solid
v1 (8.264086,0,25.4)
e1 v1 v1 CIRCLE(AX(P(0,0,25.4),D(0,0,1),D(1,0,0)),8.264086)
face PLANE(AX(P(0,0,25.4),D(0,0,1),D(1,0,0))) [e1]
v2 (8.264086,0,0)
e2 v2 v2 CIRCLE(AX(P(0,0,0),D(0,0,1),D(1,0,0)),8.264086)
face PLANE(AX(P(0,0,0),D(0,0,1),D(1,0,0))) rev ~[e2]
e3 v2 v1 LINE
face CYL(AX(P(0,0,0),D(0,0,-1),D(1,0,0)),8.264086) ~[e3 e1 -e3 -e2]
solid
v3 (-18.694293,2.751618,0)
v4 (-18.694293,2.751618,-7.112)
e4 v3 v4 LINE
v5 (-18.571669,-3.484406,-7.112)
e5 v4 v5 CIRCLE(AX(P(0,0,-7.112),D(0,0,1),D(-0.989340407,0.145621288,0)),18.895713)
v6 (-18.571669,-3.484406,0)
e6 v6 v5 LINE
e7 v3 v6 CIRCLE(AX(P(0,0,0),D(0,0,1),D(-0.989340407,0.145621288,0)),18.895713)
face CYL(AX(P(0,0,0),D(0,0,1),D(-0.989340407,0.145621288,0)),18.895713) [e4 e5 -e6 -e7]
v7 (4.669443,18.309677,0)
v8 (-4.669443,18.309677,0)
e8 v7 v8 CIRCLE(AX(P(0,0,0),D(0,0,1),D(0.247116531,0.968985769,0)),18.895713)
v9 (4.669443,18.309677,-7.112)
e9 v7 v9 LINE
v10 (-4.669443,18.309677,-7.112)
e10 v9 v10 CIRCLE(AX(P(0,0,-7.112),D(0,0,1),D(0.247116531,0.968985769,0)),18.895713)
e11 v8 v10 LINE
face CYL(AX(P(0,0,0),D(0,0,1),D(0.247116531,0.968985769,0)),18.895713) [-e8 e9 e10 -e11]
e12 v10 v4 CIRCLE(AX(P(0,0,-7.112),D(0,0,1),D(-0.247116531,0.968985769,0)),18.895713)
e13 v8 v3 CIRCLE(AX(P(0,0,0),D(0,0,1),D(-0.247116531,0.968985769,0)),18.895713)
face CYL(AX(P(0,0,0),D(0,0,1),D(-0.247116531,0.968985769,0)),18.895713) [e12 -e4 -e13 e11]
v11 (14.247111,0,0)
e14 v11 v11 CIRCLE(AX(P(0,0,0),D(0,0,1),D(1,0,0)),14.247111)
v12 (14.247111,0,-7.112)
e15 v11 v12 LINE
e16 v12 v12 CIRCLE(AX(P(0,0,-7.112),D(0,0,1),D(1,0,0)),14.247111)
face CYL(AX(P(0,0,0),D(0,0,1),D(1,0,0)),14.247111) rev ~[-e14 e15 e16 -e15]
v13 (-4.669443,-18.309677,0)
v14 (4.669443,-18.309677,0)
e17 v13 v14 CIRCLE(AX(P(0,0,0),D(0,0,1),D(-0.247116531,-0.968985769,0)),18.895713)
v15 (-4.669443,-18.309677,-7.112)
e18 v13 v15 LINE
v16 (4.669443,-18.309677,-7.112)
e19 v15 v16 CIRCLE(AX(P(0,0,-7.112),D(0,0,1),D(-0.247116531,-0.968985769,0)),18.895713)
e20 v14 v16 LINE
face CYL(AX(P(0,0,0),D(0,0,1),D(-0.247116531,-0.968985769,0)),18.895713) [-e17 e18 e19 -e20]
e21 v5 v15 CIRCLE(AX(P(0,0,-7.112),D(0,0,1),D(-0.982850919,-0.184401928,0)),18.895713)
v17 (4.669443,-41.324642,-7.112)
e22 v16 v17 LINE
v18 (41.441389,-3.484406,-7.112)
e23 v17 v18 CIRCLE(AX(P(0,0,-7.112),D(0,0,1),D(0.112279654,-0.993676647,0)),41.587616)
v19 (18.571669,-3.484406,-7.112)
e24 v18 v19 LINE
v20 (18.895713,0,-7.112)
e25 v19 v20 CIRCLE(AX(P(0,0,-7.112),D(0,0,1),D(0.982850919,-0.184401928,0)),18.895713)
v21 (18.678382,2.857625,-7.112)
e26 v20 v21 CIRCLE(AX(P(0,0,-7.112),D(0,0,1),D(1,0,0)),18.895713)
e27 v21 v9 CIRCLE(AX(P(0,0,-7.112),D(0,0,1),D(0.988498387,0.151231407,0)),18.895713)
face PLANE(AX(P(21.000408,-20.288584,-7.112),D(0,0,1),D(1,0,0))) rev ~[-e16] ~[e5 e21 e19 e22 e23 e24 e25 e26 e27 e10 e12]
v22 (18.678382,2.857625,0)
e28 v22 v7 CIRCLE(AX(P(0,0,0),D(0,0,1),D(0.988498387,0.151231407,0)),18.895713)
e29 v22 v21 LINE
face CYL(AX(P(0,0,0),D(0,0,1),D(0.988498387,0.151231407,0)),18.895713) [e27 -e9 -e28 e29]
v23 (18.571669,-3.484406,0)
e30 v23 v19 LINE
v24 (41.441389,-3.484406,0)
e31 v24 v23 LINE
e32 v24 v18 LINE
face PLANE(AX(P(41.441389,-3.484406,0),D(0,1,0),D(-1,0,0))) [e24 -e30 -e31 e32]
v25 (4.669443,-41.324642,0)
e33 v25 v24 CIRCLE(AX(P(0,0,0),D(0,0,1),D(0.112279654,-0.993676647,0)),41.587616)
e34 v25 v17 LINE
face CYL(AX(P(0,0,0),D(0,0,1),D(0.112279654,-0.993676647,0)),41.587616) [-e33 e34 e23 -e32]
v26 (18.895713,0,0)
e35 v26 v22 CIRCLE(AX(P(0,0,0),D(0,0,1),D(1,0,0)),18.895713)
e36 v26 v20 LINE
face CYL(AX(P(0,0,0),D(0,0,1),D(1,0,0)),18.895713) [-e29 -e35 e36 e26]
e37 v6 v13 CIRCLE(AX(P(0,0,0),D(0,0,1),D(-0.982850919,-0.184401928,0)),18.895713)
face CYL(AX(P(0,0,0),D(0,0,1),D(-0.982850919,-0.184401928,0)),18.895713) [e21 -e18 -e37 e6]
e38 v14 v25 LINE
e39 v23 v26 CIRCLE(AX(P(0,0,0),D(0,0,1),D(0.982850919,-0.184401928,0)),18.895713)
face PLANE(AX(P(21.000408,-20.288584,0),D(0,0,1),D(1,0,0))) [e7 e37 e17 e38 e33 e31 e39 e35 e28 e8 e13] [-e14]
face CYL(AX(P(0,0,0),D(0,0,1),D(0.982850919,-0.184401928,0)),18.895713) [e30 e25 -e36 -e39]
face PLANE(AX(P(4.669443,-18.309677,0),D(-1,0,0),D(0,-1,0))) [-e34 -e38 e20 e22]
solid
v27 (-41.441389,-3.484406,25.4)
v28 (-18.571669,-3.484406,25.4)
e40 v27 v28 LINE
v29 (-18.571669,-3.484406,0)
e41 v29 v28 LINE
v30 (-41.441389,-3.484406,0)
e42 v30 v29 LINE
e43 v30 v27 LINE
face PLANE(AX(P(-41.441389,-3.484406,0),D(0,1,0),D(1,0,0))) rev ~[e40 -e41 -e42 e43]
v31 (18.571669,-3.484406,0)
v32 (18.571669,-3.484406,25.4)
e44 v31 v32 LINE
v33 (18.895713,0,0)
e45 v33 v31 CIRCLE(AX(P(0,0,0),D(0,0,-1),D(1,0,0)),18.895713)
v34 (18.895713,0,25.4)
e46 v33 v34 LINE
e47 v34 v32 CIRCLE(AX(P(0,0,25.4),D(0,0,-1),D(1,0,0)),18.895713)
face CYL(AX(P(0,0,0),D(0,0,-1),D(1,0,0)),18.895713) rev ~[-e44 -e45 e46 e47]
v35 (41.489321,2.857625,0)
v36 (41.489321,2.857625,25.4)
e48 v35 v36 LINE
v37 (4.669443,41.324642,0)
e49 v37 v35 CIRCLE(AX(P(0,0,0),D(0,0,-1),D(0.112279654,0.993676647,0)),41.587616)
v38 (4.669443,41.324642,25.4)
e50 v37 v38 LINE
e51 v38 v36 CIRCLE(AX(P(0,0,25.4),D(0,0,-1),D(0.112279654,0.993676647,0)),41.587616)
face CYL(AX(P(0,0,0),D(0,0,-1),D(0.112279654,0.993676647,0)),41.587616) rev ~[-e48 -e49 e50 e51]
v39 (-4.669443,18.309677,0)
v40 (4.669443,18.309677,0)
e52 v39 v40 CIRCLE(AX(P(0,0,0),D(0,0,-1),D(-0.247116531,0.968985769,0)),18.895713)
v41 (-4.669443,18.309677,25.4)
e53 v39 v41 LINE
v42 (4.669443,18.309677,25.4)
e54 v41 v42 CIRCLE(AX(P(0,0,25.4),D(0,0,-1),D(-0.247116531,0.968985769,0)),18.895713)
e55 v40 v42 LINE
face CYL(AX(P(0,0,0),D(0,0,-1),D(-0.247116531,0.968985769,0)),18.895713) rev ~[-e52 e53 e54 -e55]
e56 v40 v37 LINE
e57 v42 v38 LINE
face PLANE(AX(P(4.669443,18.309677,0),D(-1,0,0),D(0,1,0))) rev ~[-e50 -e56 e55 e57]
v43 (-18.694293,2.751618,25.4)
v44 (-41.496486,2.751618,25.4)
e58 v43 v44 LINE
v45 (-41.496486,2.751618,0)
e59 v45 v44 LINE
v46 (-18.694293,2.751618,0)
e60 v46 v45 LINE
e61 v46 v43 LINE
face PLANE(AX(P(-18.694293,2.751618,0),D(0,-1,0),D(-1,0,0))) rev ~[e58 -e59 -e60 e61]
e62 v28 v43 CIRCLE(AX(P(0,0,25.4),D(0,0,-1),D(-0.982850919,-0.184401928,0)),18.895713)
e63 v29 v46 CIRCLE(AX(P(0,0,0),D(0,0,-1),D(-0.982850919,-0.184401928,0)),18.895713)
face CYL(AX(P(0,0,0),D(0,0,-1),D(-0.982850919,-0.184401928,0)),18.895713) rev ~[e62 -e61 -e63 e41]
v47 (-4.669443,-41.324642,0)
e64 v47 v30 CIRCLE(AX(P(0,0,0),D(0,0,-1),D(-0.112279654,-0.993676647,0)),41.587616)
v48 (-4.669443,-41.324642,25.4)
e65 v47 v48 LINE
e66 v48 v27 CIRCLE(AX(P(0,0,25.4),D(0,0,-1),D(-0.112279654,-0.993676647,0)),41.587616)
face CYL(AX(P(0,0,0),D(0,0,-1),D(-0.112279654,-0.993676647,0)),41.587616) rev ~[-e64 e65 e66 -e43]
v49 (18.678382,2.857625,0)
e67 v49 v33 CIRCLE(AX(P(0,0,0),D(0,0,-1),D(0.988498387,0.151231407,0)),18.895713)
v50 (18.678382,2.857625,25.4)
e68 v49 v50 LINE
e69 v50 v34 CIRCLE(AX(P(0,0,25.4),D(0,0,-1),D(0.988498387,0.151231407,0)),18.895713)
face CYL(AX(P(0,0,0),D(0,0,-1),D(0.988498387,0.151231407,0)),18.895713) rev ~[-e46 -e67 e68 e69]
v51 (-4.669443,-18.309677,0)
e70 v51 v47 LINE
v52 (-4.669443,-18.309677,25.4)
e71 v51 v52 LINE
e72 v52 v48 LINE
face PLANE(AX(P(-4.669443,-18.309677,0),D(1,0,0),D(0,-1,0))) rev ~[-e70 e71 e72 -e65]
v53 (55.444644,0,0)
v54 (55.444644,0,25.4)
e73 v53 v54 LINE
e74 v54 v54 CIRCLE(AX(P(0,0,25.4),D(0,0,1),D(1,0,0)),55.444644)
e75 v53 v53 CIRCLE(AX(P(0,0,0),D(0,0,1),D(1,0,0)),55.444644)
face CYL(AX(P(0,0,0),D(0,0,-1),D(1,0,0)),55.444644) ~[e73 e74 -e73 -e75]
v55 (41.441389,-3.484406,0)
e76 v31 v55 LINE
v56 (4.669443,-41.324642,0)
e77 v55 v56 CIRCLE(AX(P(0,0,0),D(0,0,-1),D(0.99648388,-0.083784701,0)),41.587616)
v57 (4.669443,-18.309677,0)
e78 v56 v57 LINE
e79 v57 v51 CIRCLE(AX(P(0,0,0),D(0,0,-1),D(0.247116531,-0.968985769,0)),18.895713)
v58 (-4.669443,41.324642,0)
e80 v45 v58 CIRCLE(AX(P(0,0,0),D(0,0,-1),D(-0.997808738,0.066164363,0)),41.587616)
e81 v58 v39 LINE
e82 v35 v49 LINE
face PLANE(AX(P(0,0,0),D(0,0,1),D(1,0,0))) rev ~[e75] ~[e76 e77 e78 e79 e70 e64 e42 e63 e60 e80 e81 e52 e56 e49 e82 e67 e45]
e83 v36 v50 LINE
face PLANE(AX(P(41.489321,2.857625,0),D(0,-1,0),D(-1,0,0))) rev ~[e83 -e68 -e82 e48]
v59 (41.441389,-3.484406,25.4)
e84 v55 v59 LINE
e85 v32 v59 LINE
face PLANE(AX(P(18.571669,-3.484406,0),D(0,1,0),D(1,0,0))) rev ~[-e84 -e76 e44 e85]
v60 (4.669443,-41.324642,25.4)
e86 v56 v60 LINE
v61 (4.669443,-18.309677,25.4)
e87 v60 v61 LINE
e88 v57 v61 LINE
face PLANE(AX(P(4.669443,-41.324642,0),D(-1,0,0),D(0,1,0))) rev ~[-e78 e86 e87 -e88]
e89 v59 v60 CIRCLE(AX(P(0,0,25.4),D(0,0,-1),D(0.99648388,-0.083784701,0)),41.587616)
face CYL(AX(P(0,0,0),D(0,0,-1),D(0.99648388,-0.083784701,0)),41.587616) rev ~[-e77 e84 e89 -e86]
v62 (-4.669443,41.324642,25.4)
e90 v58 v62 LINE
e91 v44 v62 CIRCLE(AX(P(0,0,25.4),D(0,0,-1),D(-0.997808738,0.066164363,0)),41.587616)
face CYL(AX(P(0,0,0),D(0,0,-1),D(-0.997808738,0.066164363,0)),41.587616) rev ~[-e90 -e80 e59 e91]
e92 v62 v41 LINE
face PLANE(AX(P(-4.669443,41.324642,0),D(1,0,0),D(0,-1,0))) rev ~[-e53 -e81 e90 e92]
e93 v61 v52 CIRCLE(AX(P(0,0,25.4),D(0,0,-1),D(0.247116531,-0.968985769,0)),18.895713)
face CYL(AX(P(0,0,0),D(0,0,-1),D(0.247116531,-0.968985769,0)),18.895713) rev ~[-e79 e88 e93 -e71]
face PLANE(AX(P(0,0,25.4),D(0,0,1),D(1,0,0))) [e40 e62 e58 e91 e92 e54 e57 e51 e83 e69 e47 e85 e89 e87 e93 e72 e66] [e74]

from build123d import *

# Parameters (mm, degrees)
F0_R     = 55.4446440976
F1_DEPTH = 25.4
F2_DEPTH = 25.4
F0_R_2   = 14.2471113664
F3_DEPTH = 7.112
F0_R_3   = 8.2640856971
F4_DEPTH = 25.4


# Not quite as in the source:
# - a feature names something its author has since deleted; it is built from what else it names


with BuildPart() as f1:
    # F0 (on Top) → F1 (new body)
    with BuildSketch(Plane.XY):
        Circle(F0_R)
        with BuildLine():
            ThreePointArc((4.6694431101, 41.3246424597), (30.0430645384, 28.7566348262), (41.4893209282, 2.8576252906))
            ThreePointArc((41.4893209282, 2.8576252906), (41.5630346864, 1.4296576644), (41.5876156251, 0))
            ThreePointArc((41.5876156251, 0), (41.551042786, -1.743736442), (41.4413885942, -3.4844059424))
            ThreePointArc((41.4413885942, -3.4844059424), (29.8248734287, -28.9828690496), (4.6694431101, -41.3246424597))
            ThreePointArc((4.6694431101, -41.3246424597), (0, -41.5876156251), (-4.6694431101, -41.3246424597))
            ThreePointArc((-4.6694431101, -41.3246424597), (-29.8248734287, -28.9828690496), (-41.4413885942, -3.4844059424))
            ThreePointArc((-41.4413885942, -3.4844059424), (-41.5859924727, -0.3674281517), (-41.496486252, 2.7516180913))
            ThreePointArc((-41.496486252, 2.7516180913), (-30.0797741132, 28.7182339757), (-4.6694431101, 41.3246424597))
            ThreePointArc((-4.6694431101, 41.3246424597), (0, 41.5876156251), (4.6694431101, 41.3246424597))
        make_face(mode=Mode.SUBTRACT)
    extrude(amount=F1_DEPTH)

    # F0 (on Top) → F2 (join)
    with BuildSketch(Plane.XY):
        Circle(F0_R)
        with BuildLine():
            ThreePointArc((4.6694431101, 41.3246424597), (30.0430645384, 28.7566348262), (41.4893209282, 2.8576252906))
            ThreePointArc((41.4893209282, 2.8576252906), (41.5630346864, 1.4296576644), (41.5876156251, 0))
            ThreePointArc((41.5876156251, 0), (41.551042786, -1.743736442), (41.4413885942, -3.4844059424))
            ThreePointArc((41.4413885942, -3.4844059424), (29.8248734287, -28.9828690496), (4.6694431101, -41.3246424597))
            ThreePointArc((4.6694431101, -41.3246424597), (0, -41.5876156251), (-4.6694431101, -41.3246424597))
            ThreePointArc((-4.6694431101, -41.3246424597), (-29.8248734287, -28.9828690496), (-41.4413885942, -3.4844059424))
            ThreePointArc((-41.4413885942, -3.4844059424), (-41.5859924727, -0.3674281517), (-41.496486252, 2.7516180913))
            ThreePointArc((-41.496486252, 2.7516180913), (-30.0797741132, 28.7182339757), (-4.6694431101, 41.3246424597))
            ThreePointArc((-4.6694431101, 41.3246424597), (0, 41.5876156251), (4.6694431101, 41.3246424597))
        make_face(mode=Mode.SUBTRACT)
        with BuildLine():
            ThreePointArc((-4.6694431101, 18.3096772012), (0, 18.895713222), (4.6694431101, 18.3096772012))
            Line((4.6694431101, 18.3096772012), (4.6694431101, 41.3246424597))
            ThreePointArc((4.6694431101, 41.3246424597), (0, 41.5876156251), (-4.6694431101, 41.3246424597))
            Line((-4.6694431101, 41.3246424597), (-4.6694431101, 18.3096772012))
        make_face()
        with BuildLine():
            ThreePointArc((-18.5716691064, -3.4844059424), (-18.8920611509, -0.3714884108), (-18.6942926063, 2.7516180913))
            Line((-18.6942926063, 2.7516180913), (-41.496486252, 2.7516180913))
            ThreePointArc((-41.496486252, 2.7516180913), (-41.5859924727, -0.3674281517), (-41.4413885942, -3.4844059424))
            Line((-41.4413885942, -3.4844059424), (-18.5716691064, -3.4844059424))
        make_face()
        with BuildLine():
            Line((4.6694431101, -41.3246424597), (4.6694431101, -18.3096772012))
            ThreePointArc((4.6694431101, -18.3096772012), (0, -18.895713222), (-4.6694431101, -18.3096772012))
            Line((-4.6694431101, -18.3096772012), (-4.6694431101, -41.3246424597))
            ThreePointArc((-4.6694431101, -41.3246424597), (0, -41.5876156251), (4.6694431101, -41.3246424597))
        make_face()
        with BuildLine():
            ThreePointArc((18.6783820463, 2.8576252906), (18.8413020883, 1.4329388631), (18.895713222, 0))
            ThreePointArc((18.895713222, 0), (18.8145277865, -1.7497206463), (18.5716691064, -3.4844059424))
            Line((18.5716691064, -3.4844059424), (41.4413885942, -3.4844059424))
            ThreePointArc((41.4413885942, -3.4844059424), (41.551042786, -1.743736442), (41.5876156251, 0))
            ThreePointArc((41.5876156251, 0), (41.5630346864, 1.4296576644), (41.4893209282, 2.8576252906))
            Line((41.4893209282, 2.8576252906), (18.6783820463, 2.8576252906))
        make_face()
    extrude(amount=F2_DEPTH)


with BuildPart() as f3:
    # F0 (on Top) → F3 (new body)
    with BuildSketch(Plane.XY):
        with BuildLine():
            Line((41.4413885942, -3.4844059424), (18.5716691064, -3.4844059424))
            ThreePointArc((18.5716691064, -3.4844059424), (13.7834861787, -12.925304133), (4.6694431101, -18.3096772012))
            Line((4.6694431101, -18.3096772012), (4.6694431101, -41.3246424597))
            ThreePointArc((4.6694431101, -41.3246424597), (29.8248734287, -28.9828690496), (41.4413885942, -3.4844059424))
        make_face()
        with BuildLine():
            ThreePointArc((18.5716691064, -3.4844059424), (18.8145277865, -1.7497206463), (18.895713222, 0))
            ThreePointArc((18.895713222, 0), (18.8413020883, 1.4329388631), (18.6783820463, 2.8576252906))
            ThreePointArc((18.6783820463, 2.8576252906), (13.9989896759, 12.6915824949), (4.6694431101, 18.3096772012))
            ThreePointArc((4.6694431101, 18.3096772012), (0, 18.895713222), (-4.6694431101, 18.3096772012))
            ThreePointArc((-4.6694431101, 18.3096772012), (-14.0349327563, 12.6518236115), (-18.6942926063, 2.7516180913))
            ThreePointArc((-18.6942926063, 2.7516180913), (-18.8920611509, -0.3714884108), (-18.5716691064, -3.4844059424))
            ThreePointArc((-18.5716691064, -3.4844059424), (-13.7834861787, -12.925304133), (-4.6694431101, -18.3096772012))
            ThreePointArc((-4.6694431101, -18.3096772012), (0, -18.895713222), (4.6694431101, -18.3096772012))
            ThreePointArc((4.6694431101, -18.3096772012), (13.7834861787, -12.925304133), (18.5716691064, -3.4844059424))
        make_face()
        Circle(F0_R_2, mode=Mode.SUBTRACT)
    extrude(amount=-F3_DEPTH)


with BuildPart() as f4:
    # F0 (on Top) → F4 (new body)
    with BuildSketch(Plane.XY):
        Circle(F0_R_3)
    extrude(amount=F4_DEPTH)


solid = Compound([f1.part, f3.part, f4.part])
